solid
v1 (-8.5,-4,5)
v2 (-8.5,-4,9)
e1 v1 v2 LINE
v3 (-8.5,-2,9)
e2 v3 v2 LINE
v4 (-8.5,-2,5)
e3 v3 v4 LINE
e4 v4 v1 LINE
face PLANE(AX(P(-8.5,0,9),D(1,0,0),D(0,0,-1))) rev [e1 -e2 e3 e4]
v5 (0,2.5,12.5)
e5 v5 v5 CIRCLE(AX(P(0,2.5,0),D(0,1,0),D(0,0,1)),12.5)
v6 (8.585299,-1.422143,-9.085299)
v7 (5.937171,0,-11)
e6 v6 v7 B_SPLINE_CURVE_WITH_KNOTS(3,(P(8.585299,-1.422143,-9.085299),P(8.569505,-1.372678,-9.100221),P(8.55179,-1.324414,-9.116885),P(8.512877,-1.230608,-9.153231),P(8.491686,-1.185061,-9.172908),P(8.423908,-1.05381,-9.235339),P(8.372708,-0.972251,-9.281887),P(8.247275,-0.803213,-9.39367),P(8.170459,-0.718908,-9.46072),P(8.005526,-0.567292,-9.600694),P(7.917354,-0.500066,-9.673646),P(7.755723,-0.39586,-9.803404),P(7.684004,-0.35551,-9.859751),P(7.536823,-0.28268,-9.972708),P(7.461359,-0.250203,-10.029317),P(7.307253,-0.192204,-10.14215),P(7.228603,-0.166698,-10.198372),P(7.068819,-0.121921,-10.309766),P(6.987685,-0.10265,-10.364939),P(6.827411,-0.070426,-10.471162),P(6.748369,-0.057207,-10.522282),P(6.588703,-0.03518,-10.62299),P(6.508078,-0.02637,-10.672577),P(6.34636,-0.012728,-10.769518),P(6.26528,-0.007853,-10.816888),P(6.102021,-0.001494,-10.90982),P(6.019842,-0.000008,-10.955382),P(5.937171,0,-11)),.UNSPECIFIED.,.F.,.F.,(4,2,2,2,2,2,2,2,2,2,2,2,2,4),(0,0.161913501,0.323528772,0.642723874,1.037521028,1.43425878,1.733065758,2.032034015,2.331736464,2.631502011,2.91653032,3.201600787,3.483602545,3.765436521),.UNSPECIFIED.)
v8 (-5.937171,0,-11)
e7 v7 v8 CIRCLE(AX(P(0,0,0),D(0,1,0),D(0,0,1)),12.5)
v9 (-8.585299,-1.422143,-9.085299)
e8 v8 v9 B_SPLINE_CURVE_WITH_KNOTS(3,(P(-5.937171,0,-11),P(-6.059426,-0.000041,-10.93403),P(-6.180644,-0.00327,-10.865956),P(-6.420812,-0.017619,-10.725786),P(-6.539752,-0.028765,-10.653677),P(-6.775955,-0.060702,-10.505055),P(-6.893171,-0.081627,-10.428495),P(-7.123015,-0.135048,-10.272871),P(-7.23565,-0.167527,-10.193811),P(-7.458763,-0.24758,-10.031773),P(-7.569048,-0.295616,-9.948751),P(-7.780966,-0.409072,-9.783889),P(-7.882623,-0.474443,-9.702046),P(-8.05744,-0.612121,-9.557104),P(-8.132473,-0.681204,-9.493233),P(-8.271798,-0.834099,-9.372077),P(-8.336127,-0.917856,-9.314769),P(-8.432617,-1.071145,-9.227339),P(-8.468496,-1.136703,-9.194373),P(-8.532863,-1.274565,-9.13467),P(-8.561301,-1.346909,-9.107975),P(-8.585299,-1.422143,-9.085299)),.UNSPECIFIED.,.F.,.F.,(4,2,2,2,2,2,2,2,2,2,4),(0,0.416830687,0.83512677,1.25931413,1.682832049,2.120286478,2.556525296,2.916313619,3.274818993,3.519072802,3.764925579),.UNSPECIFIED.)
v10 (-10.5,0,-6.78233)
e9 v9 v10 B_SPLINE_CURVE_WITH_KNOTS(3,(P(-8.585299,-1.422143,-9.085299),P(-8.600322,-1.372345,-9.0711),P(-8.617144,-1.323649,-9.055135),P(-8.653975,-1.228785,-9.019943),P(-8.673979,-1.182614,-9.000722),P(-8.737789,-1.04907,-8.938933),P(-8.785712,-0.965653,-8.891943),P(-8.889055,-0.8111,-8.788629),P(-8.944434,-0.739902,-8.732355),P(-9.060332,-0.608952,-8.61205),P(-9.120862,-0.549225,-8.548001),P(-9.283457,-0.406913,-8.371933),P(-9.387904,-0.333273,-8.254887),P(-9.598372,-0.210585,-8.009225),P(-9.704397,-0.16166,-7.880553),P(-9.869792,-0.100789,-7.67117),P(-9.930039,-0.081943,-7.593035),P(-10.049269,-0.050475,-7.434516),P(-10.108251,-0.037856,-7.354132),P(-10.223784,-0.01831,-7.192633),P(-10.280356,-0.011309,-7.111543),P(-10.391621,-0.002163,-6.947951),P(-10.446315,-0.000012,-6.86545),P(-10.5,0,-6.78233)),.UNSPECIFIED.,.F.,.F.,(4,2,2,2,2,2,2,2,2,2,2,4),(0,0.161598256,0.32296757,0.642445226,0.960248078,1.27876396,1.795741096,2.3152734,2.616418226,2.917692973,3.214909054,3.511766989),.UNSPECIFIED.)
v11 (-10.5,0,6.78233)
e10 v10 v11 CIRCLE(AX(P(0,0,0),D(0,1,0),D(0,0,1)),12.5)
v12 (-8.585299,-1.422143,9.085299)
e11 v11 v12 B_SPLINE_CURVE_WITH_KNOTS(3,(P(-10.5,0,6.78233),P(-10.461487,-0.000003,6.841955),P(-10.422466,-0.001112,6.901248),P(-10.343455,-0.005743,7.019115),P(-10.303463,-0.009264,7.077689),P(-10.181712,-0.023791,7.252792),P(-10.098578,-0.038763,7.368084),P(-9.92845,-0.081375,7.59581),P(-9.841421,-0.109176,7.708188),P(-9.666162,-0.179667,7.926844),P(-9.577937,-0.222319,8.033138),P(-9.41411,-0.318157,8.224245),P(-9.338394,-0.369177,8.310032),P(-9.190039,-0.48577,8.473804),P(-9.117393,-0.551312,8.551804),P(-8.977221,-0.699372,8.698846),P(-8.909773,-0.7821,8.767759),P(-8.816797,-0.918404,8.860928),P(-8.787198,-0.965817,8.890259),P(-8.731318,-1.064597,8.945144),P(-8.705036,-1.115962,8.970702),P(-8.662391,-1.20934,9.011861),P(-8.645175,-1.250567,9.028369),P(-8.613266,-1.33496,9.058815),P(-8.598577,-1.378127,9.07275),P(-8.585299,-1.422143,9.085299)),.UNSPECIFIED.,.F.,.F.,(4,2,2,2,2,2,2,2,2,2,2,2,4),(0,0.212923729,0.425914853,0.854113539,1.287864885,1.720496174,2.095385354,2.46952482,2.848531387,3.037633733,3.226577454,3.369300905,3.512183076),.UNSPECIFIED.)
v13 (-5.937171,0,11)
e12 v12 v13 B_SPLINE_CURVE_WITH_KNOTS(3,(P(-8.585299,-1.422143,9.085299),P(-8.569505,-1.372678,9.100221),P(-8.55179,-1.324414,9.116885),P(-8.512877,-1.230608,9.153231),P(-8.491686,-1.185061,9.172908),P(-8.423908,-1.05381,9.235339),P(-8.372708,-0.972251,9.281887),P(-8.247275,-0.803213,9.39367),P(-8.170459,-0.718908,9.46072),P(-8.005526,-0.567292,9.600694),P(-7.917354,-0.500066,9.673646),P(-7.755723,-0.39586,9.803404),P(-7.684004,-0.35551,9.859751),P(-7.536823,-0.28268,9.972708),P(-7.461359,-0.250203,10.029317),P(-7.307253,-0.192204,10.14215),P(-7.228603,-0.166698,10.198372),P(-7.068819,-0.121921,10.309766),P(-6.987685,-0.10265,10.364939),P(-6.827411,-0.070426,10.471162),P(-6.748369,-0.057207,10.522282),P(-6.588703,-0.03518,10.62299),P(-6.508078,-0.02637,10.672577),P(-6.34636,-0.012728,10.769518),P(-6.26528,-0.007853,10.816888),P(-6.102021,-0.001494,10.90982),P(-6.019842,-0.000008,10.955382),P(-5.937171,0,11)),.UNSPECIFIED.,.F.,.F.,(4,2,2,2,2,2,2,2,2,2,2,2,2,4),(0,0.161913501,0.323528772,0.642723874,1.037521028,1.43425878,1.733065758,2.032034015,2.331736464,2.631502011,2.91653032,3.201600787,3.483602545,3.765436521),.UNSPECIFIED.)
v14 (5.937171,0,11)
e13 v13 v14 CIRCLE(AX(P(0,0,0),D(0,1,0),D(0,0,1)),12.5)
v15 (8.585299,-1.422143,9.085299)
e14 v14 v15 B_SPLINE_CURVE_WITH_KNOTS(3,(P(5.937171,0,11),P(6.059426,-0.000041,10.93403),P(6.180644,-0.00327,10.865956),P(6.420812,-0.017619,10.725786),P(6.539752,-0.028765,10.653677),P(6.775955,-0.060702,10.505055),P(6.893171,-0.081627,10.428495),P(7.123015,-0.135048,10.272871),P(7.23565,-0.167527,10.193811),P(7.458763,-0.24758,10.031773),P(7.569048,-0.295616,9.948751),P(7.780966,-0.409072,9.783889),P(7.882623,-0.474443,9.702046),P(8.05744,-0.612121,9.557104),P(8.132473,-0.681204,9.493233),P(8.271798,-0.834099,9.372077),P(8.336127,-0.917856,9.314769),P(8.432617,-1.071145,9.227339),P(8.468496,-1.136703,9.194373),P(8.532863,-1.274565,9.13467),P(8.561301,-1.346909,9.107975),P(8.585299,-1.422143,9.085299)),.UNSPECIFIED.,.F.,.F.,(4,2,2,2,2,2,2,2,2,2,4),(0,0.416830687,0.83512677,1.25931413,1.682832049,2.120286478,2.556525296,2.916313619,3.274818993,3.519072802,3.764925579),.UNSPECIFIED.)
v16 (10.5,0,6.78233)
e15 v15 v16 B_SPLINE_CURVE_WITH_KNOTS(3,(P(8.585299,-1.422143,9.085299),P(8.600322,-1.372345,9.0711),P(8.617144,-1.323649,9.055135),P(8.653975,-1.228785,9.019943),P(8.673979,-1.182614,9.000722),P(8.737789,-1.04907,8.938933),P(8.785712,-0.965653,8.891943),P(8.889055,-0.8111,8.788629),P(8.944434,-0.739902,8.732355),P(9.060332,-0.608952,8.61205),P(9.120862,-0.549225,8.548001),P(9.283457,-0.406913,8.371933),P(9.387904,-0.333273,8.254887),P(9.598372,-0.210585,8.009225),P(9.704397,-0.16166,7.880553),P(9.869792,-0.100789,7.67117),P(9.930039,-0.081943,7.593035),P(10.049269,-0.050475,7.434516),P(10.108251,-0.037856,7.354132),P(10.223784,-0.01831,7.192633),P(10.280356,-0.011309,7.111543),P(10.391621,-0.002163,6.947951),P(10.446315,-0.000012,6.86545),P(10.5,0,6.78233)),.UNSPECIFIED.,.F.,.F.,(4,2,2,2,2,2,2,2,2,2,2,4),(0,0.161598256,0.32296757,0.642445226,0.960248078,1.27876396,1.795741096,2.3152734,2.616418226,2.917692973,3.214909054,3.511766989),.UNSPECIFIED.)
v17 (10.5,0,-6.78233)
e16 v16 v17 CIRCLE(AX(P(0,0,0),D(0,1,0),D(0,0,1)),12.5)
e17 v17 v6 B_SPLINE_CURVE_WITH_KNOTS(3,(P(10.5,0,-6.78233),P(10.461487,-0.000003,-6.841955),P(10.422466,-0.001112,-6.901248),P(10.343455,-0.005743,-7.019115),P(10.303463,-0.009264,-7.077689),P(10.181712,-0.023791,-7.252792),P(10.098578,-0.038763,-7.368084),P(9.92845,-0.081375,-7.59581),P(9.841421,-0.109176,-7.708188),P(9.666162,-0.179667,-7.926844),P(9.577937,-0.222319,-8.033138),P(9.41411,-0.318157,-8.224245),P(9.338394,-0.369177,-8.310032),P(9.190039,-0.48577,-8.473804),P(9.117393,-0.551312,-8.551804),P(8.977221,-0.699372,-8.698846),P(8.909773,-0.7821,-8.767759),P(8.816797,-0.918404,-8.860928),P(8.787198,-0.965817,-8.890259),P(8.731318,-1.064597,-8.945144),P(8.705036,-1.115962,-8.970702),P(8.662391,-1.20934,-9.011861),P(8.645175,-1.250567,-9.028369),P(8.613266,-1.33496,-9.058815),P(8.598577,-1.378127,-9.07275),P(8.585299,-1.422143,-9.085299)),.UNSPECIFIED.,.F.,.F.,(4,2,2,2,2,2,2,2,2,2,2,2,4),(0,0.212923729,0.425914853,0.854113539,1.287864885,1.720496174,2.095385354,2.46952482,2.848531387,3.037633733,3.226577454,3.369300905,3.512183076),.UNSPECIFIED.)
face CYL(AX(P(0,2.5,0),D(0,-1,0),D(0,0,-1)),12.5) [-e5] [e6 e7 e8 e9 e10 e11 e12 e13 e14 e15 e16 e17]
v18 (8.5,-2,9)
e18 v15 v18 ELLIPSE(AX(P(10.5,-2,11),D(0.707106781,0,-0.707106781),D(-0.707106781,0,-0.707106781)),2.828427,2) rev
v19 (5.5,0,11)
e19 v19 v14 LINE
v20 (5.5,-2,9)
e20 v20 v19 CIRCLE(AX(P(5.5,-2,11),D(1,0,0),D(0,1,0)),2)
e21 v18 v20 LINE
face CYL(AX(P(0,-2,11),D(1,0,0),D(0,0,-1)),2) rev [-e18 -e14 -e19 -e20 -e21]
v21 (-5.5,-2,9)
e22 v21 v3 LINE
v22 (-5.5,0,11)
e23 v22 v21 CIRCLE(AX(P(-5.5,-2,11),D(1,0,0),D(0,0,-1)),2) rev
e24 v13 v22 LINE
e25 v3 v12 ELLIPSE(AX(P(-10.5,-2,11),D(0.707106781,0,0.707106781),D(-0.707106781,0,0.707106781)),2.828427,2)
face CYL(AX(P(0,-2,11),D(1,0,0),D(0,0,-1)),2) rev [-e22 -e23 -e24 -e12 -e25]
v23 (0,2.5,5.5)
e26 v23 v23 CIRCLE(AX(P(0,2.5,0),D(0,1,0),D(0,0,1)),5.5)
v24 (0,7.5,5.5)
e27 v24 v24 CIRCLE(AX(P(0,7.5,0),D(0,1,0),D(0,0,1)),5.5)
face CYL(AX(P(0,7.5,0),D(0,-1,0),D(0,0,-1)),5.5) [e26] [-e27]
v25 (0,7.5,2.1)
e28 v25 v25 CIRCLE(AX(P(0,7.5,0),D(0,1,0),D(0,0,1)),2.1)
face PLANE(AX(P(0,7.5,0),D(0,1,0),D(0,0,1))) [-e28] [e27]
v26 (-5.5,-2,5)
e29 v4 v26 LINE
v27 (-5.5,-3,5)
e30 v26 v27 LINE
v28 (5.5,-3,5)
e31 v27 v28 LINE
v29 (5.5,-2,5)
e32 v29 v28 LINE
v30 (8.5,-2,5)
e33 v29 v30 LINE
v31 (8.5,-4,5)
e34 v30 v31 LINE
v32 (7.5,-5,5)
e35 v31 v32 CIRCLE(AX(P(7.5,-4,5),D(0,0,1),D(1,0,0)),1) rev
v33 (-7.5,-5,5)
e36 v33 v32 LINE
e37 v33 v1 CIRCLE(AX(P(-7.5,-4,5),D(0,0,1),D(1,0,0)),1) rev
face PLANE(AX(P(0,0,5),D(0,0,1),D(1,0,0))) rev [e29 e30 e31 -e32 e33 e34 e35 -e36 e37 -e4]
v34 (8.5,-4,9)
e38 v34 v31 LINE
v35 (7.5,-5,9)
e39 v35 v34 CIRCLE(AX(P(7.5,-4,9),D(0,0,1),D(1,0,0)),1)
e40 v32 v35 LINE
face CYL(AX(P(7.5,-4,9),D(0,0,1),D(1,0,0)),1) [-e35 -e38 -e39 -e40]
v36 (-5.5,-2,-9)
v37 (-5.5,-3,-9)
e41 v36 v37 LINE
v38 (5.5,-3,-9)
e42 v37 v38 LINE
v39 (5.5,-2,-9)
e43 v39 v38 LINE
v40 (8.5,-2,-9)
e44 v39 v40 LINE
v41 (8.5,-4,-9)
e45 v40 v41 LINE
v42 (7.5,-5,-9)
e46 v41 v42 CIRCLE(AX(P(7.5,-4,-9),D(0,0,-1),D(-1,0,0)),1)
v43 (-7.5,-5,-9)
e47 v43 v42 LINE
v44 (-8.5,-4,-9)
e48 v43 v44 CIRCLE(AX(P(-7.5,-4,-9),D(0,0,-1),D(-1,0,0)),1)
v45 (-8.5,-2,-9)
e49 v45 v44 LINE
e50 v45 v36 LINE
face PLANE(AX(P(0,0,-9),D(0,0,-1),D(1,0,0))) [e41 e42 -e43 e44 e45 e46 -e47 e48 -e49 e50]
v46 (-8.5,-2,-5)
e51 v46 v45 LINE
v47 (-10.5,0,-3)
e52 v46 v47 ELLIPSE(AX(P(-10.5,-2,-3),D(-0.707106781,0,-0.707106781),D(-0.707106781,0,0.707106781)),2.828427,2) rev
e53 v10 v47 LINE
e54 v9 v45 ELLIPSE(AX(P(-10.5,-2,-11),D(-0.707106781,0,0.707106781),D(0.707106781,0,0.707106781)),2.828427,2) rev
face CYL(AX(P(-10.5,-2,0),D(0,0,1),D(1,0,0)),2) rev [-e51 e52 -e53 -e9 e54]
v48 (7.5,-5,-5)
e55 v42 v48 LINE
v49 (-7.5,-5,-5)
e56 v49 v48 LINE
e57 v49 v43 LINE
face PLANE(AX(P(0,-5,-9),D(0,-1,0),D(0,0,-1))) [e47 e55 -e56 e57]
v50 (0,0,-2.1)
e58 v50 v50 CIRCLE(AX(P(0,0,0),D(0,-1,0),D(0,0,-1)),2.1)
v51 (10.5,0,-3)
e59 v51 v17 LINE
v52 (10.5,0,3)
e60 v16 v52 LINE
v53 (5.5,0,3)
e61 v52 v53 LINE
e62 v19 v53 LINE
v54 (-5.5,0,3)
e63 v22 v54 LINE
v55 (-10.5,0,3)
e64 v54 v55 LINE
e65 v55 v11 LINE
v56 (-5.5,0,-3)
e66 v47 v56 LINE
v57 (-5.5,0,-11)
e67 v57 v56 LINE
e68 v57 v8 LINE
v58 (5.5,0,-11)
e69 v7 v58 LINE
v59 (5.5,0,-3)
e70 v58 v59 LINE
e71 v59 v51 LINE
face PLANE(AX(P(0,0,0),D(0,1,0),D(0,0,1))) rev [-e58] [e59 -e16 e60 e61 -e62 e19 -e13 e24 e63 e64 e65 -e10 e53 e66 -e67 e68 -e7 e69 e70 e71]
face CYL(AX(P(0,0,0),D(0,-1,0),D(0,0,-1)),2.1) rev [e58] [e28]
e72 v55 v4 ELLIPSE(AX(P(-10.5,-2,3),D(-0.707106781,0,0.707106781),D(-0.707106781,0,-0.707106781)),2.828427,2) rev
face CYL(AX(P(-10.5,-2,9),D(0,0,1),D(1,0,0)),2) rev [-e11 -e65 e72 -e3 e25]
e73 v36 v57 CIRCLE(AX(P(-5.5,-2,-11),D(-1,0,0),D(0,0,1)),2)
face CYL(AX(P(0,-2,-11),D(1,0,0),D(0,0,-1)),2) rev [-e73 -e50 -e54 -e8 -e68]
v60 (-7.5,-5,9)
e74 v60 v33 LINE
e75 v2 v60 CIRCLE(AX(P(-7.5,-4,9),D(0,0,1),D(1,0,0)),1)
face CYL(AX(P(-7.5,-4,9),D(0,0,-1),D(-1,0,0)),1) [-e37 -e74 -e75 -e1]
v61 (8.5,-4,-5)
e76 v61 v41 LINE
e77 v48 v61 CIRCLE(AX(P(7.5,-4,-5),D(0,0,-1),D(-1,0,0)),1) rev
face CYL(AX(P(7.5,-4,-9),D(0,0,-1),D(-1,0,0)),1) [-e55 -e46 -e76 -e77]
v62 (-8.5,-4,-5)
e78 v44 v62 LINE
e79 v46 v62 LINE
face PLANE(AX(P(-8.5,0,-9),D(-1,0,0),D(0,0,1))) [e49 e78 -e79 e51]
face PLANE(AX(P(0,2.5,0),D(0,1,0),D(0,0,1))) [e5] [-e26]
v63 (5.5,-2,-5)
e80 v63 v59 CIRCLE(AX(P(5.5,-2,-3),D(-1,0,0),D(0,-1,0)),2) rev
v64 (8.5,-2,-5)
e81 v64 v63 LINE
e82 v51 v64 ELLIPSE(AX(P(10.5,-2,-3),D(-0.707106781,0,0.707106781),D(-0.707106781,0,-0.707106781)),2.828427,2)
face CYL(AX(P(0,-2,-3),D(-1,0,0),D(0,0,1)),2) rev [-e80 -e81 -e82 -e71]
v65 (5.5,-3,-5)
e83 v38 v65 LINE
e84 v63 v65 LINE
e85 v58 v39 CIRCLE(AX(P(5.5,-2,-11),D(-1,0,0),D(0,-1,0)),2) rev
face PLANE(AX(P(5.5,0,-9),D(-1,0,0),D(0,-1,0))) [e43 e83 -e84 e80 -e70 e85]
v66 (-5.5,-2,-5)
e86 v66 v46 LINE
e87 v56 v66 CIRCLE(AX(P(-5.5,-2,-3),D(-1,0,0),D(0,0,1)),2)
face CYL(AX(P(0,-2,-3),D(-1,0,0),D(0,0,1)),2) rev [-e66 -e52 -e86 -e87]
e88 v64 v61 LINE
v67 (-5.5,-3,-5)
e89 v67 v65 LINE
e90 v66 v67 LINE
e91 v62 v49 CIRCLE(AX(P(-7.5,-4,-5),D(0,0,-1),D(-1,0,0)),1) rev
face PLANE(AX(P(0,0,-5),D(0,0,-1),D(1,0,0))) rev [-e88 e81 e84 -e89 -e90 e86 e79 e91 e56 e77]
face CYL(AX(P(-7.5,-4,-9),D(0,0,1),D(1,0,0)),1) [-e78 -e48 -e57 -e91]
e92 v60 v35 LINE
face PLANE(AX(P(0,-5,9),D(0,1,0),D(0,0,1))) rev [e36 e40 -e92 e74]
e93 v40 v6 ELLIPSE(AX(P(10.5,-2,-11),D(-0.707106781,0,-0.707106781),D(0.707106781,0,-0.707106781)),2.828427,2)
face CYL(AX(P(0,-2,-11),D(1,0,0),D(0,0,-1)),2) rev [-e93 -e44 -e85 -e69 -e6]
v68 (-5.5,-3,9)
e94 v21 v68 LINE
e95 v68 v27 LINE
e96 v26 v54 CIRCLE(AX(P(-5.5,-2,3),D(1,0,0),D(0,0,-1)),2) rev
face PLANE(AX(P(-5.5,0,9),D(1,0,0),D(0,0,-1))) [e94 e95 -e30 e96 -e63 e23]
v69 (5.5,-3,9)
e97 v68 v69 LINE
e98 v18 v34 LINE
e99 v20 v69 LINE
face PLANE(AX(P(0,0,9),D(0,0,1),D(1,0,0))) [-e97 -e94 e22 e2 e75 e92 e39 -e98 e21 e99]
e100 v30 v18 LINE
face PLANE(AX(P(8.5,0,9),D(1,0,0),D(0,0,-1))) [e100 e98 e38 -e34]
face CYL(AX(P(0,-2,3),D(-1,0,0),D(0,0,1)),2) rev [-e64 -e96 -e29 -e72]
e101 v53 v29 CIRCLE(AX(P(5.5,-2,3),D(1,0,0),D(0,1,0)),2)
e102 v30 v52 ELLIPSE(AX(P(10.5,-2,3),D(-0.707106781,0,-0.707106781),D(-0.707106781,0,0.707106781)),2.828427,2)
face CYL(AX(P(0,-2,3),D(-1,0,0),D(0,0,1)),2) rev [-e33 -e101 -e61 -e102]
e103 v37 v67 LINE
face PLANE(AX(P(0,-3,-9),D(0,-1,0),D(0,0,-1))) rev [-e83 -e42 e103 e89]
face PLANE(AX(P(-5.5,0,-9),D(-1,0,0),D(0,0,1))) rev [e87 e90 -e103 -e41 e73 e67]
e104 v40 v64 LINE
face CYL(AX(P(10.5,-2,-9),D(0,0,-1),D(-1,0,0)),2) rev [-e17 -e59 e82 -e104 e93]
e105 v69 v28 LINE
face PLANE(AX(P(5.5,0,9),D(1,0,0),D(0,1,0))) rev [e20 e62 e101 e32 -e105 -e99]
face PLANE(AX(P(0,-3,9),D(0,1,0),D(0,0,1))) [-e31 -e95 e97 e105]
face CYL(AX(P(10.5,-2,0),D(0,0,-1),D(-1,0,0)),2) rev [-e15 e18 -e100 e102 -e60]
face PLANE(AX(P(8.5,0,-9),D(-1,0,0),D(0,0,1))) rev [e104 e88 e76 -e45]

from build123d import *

# Parameters (mm, degrees)
SKETCH1_R                 = 12.5
BOSS_EXTRUDE1_DEPTH       = 2.5
SKETCH2_R                 = 5.5
BOSS_EXTRUDE2_DEPTH       = 5
F_3_0MM_DOWEL_HOLE1_D     = 4.2
F_3_0MM_DOWEL_HOLE1_DEPTH = 10
F_3_0MM_DOWEL_HOLE1_TIP   = 1.2618073
BOSS_EXTRUDE3_START       = -3
BOSS_EXTRUDE3_DEPTH       = 4
FILLET1_R                 = 2
FILLET2_R                 = 1


with BuildPart() as part:
    # Sketch1 → Boss-Extrude1 (new body)
    with BuildSketch(Plane(origin=(0, 0, 0), x_dir=(1, 0, 0), z_dir=(0, 1, 0))):
        with Locations(Location((0, 0, 0), (0, 0, 270))):
            Circle(SKETCH1_R)
    extrude(amount=BOSS_EXTRUDE1_DEPTH)

    # Sketch2 → Boss-Extrude2 (add)
    with BuildSketch(Plane(origin=(0, 2.5, 0), x_dir=(1, 0, 0), z_dir=(0, 1, 0))):
        with Locations(Location((0, 0, 0), (0, 0, 270))):
            Circle(SKETCH2_R)
    extrude(amount=BOSS_EXTRUDE2_DEPTH)

    # Ø3.0mm Dowel Hole1
    with Locations(Plane(origin=(0, 0, 0), x_dir=(-1, 0, 0), z_dir=(0, -1, 0))):
        with Locations((0, 0)):
            Hole(F_3_0MM_DOWEL_HOLE1_D / 2, depth=F_3_0MM_DOWEL_HOLE1_DEPTH)
            with Locations((0, 0, -(F_3_0MM_DOWEL_HOLE1_DEPTH + F_3_0MM_DOWEL_HOLE1_TIP / 2))):  # 118° drill point
                Cone(0, F_3_0MM_DOWEL_HOLE1_D / 2, F_3_0MM_DOWEL_HOLE1_TIP, mode=Mode.SUBTRACT)

    # Sketch6 → Boss-Extrude3 (add)
    with BuildSketch(Plane.XY.offset(8).offset(BOSS_EXTRUDE3_START)):
        Polygon((-5.5, 0), (-8.5, 0), (-8.5, -5), (8.5, -5), (8.5, 0), (5.5, 0), (5.5, -3), (-5.5, -3), align=None)
    boss_extrude3 = extrude(amount=BOSS_EXTRUDE3_DEPTH)

    # Mirror1: Boss-Extrude3 across plane
    add(boss_extrude3.mirror(Plane.XY))

    # Fillet1
    # the kernel refuses this fillet: 2 mm, written as the material it adds along each edge
    with BuildSketch(Plane(origin=(8.5, 0, 5), x_dir=(1, 0, 0), z_dir=(0, 0, 1))) as fillet1_piece_1_section:
        with BuildLine():
            CenterArc((FILLET1_R, -FILLET1_R), FILLET1_R, 90, 90)
            Line((0, -FILLET1_R), (0, 0))
            Line((0, 0), (FILLET1_R, 0))
        make_face()
    fillet1_piece_1 = extrude(amount=4, mode=Mode.PRIVATE)
    fillet1_piece_1 = fillet1_piece_1 & Plane(origin=(0, -0.480708784, 0), x_dir=(0, 0, 1), z_dir=(0, -1, 0)) * Cylinder(12.5, 16, mode=Mode.PRIVATE)
    add(fillet1_piece_1)
    with BuildSketch(Plane(origin=(8.5, 0, 9), x_dir=(0, 0, 1), z_dir=(-1, 0, 0))) as fillet1_piece_2_section:
        with BuildLine():
            CenterArc((FILLET1_R, -FILLET1_R), FILLET1_R, 90, 90)
            Line((0, -FILLET1_R), (0, 0))
            Line((0, 0), (FILLET1_R, 0))
        make_face()
    fillet1_piece_2 = extrude(amount=3, mode=Mode.PRIVATE)
    fillet1_piece_2 = fillet1_piece_2 & Plane(origin=(0, -0.497609904, 0), x_dir=(0, 0, 1), z_dir=(0, -1, 0)) * Cylinder(12.5, 14, mode=Mode.PRIVATE)
    add(fillet1_piece_2)
    with BuildSketch(Plane(origin=(-5.5, 0, 9), x_dir=(0, 0, 1), z_dir=(-1, 0, 0))) as fillet1_piece_3_section:
        with BuildLine():
            CenterArc((FILLET1_R, -FILLET1_R), FILLET1_R, 90, 90)
            Line((0, -FILLET1_R), (0, 0))
            Line((0, 0), (FILLET1_R, 0))
        make_face()
    fillet1_piece_3 = extrude(amount=3, mode=Mode.PRIVATE)
    fillet1_piece_3 = fillet1_piece_3 & Plane(origin=(0, -0.497609936, 0), x_dir=(0, 0, 1), z_dir=(0, -1, 0)) * Cylinder(12.5, 14, mode=Mode.PRIVATE)
    add(fillet1_piece_3)
    with BuildSketch(Plane(origin=(-8.5, 0, 5), x_dir=(-1, 0, 0), z_dir=(0, 0, 1))) as fillet1_piece_4_section:
        with BuildLine():
            CenterArc((FILLET1_R, FILLET1_R), FILLET1_R, 180, 90)
            Line((0, FILLET1_R), (0, 0))
            Line((0, 0), (FILLET1_R, 0))
        make_face()
    fillet1_piece_4 = extrude(amount=4, mode=Mode.PRIVATE)
    fillet1_piece_4 = fillet1_piece_4 & Plane(origin=(0, -0.48070882, 0), x_dir=(0, 0, 1), z_dir=(0, -1, 0)) * Cylinder(12.5, 16, mode=Mode.PRIVATE)
    add(fillet1_piece_4)
    with BuildSketch(Plane(origin=(8.5, 0, 5), x_dir=(0, 0, -1), z_dir=(-1, 0, 0)), Plane(origin=(-5.5, 0, 5), x_dir=(0, 0, -1), z_dir=(-1, 0, 0))) as fillet1_piece_5:
        with BuildLine():
            CenterArc((FILLET1_R, FILLET1_R), FILLET1_R, 180, 90)
            Line((0, FILLET1_R), (0, 0))
            Line((0, 0), (FILLET1_R, 0))
        make_face()
    extrude(amount=3)
    with BuildSketch(Plane(origin=(8.5, 0, -5), x_dir=(0, 0, 1), z_dir=(-1, 0, 0)), Plane(origin=(-5.5, 0, -5), x_dir=(0, 0, 1), z_dir=(-1, 0, 0))) as fillet1_piece_6:
        with BuildLine():
            CenterArc((FILLET1_R, -FILLET1_R), FILLET1_R, 90, 90)
            Line((0, -FILLET1_R), (0, 0))
            Line((0, 0), (FILLET1_R, 0))
        make_face()
    extrude(amount=3)
    with BuildSketch(Plane(origin=(8.5, 0, -5), x_dir=(1, 0, 0), z_dir=(0, 0, -1))) as fillet1_piece_7_section:
        with BuildLine():
            CenterArc((FILLET1_R, FILLET1_R), FILLET1_R, 180, 90)
            Line((0, FILLET1_R), (0, 0))
            Line((0, 0), (FILLET1_R, 0))
        make_face()
    fillet1_piece_7 = extrude(amount=4, mode=Mode.PRIVATE)
    fillet1_piece_7 = fillet1_piece_7 & Plane(origin=(0, -0.48070882, 0), x_dir=(0, 0, 1), z_dir=(0, -1, 0)) * Cylinder(12.5, 16, mode=Mode.PRIVATE)
    add(fillet1_piece_7)
    with BuildSketch(Plane(origin=(-8.5, 0, -5), x_dir=(-1, 0, 0), z_dir=(0, 0, -1))) as fillet1_piece_8_section:
        with BuildLine():
            CenterArc((FILLET1_R, -FILLET1_R), FILLET1_R, 90, 90)
            Line((0, -FILLET1_R), (0, 0))
            Line((0, 0), (FILLET1_R, 0))
        make_face()
    fillet1_piece_8 = extrude(amount=4, mode=Mode.PRIVATE)
    fillet1_piece_8 = fillet1_piece_8 & Plane(origin=(0, -0.480708785, 0), x_dir=(0, 0, 1), z_dir=(0, -1, 0)) * Cylinder(12.5, 16, mode=Mode.PRIVATE)
    add(fillet1_piece_8)
    with BuildSketch(Plane(origin=(8.5, 0, -9), x_dir=(0, 0, -1), z_dir=(-1, 0, 0))) as fillet1_piece_9_section:
        with BuildLine():
            CenterArc((FILLET1_R, FILLET1_R), FILLET1_R, 180, 90)
            Line((0, FILLET1_R), (0, 0))
            Line((0, 0), (FILLET1_R, 0))
        make_face()
    fillet1_piece_9 = extrude(amount=3, mode=Mode.PRIVATE)
    fillet1_piece_9 = fillet1_piece_9 & Plane(origin=(0, -0.497609946, 0), x_dir=(0, 0, 1), z_dir=(0, -1, 0)) * Cylinder(12.5, 14, mode=Mode.PRIVATE)
    add(fillet1_piece_9)
    with BuildSketch(Plane(origin=(-5.5, 0, -9), x_dir=(0, 0, -1), z_dir=(-1, 0, 0))) as fillet1_piece_10_section:
        with BuildLine():
            CenterArc((FILLET1_R, FILLET1_R), FILLET1_R, 180, 90)
            Line((0, FILLET1_R), (0, 0))
            Line((0, 0), (FILLET1_R, 0))
        make_face()
    fillet1_piece_10 = extrude(amount=3, mode=Mode.PRIVATE)
    fillet1_piece_10 = fillet1_piece_10 & Plane(origin=(0, -0.497609939, 0), x_dir=(0, 0, 1), z_dir=(0, -1, 0)) * Cylinder(12.5, 14, mode=Mode.PRIVATE)
    add(fillet1_piece_10)
    with BuildSketch(Plane(origin=(13.5, 0, 5), x_dir=(0, 0, -1), z_dir=(-1, 0, 0))) as fillet1_piece_11a_section:
        with BuildLine():
            CenterArc((FILLET1_R, FILLET1_R), FILLET1_R, 180, 90)
            Line((0, FILLET1_R), (0, 0))
            Line((0, 0), (FILLET1_R, 0))
        make_face()
    fillet1_piece_11a = extrude(amount=8, mode=Mode.PRIVATE)
    fillet1_piece_11a = fillet1_piece_11a & Plane(origin=(0, -0.439550535, 0), x_dir=(0, 0, 1), z_dir=(0, -1, 0)) * Cylinder(12.5, 24, mode=Mode.PRIVATE)
    fillet1_piece_11a = split(fillet1_piece_11a, bisect_by=Plane(origin=(8.5, -0.439550535, 4.525411001), z_dir=(1, 0, 0)), keep=Keep.TOP, mode=Mode.PRIVATE)
    with BuildSketch(Plane(origin=(8.5, 0, 0), x_dir=(1, 0, 0), z_dir=(0, 0, 1))) as fillet1_piece_11b_section:
        with BuildLine():
            CenterArc((FILLET1_R, -FILLET1_R), FILLET1_R, 90, 90)
            Line((0, -FILLET1_R), (0, 0))
            Line((0, 0), (FILLET1_R, 0))
        make_face()
    fillet1_piece_11b = extrude(amount=9, mode=Mode.PRIVATE)
    fillet1_piece_11b = split(fillet1_piece_11b, bisect_by=Plane(origin=(8.952790229, -0.452790229, 5), z_dir=(0, 0, -1)), keep=Keep.TOP, mode=Mode.PRIVATE)
    fillet1_piece_11 = fillet1_piece_11a & fillet1_piece_11b
    add(fillet1_piece_11)
    with BuildSketch(Plane(origin=(8.5, 0, 5), x_dir=(1, 0, 0), z_dir=(0, 0, 1))) as fillet1_piece_12a_section:
        with BuildLine():
            CenterArc((FILLET1_R, -FILLET1_R), FILLET1_R, 90, 90)
            Line((0, -FILLET1_R), (0, 0))
            Line((0, 0), (FILLET1_R, 0))
        make_face()
    fillet1_piece_12a = extrude(amount=9, mode=Mode.PRIVATE)
    fillet1_piece_12a = fillet1_piece_12a & Plane(origin=(0, -0.851863441, 0), x_dir=(0, 0, 1), z_dir=(0, -1, 0)) * Cylinder(12.5, 26, mode=Mode.PRIVATE)
    fillet1_piece_12a = split(fillet1_piece_12a, bisect_by=Plane(origin=(8.524607879, -0.851863441, 9), z_dir=(0, 0, 1)), keep=Keep.TOP, mode=Mode.PRIVATE)
    with BuildSketch(Plane(origin=(13.5, 0, 9), x_dir=(0, 0, 1), z_dir=(-1, 0, 0))) as fillet1_piece_12b_section:
        with BuildLine():
            CenterArc((FILLET1_R, -FILLET1_R), FILLET1_R, 90, 90)
            Line((0, -FILLET1_R), (0, 0))
            Line((0, 0), (FILLET1_R, 0))
        make_face()
    fillet1_piece_12b = extrude(amount=8, mode=Mode.PRIVATE)
    fillet1_piece_12b = fillet1_piece_12b & Plane(origin=(0, -0.857818141, 0), x_dir=(0, 0, 1), z_dir=(0, -1, 0)) * Cylinder(12.5, 24, mode=Mode.PRIVATE)
    fillet1_piece_12b = split(fillet1_piece_12b, bisect_by=Plane(origin=(8.5, -0.857818141, 9.021962646), z_dir=(1, 0, 0)), keep=Keep.TOP, mode=Mode.PRIVATE)
    fillet1_piece_12 = fillet1_piece_12a & fillet1_piece_12b
    add(fillet1_piece_12)
    with BuildSketch(Plane(origin=(-8.5, 0, 5), x_dir=(-1, 0, 0), z_dir=(0, 0, 1))) as fillet1_piece_13a_section:
        with BuildLine():
            CenterArc((FILLET1_R, FILLET1_R), FILLET1_R, 180, 90)
            Line((0, FILLET1_R), (0, 0))
            Line((0, 0), (FILLET1_R, 0))
        make_face()
    fillet1_piece_13a = extrude(amount=9, mode=Mode.PRIVATE)
    fillet1_piece_13a = fillet1_piece_13a & Plane(origin=(0, -0.851863441, 0), x_dir=(0, 0, 1), z_dir=(0, -1, 0)) * Cylinder(12.5, 26, mode=Mode.PRIVATE)
    fillet1_piece_13a = split(fillet1_piece_13a, bisect_by=Plane(origin=(-8.524607879, -0.851863441, 9), z_dir=(0, 0, 1)), keep=Keep.TOP, mode=Mode.PRIVATE)
    with BuildSketch(Plane(origin=(-5.5, 0, 9), x_dir=(0, 0, 1), z_dir=(-1, 0, 0))) as fillet1_piece_13b_section:
        with BuildLine():
            CenterArc((FILLET1_R, -FILLET1_R), FILLET1_R, 90, 90)
            Line((0, -FILLET1_R), (0, 0))
            Line((0, 0), (FILLET1_R, 0))
        make_face()
    fillet1_piece_13b = extrude(amount=8, mode=Mode.PRIVATE)
    fillet1_piece_13b = fillet1_piece_13b & Plane(origin=(0, -0.857818141, 0), x_dir=(0, 0, 1), z_dir=(0, -1, 0)) * Cylinder(12.5, 24, mode=Mode.PRIVATE)
    fillet1_piece_13b = split(fillet1_piece_13b, bisect_by=Plane(origin=(-8.5, -0.857818141, 9.021962647), z_dir=(-1, 0, 0)), keep=Keep.TOP, mode=Mode.PRIVATE)
    fillet1_piece_13 = fillet1_piece_13a & fillet1_piece_13b
    add(fillet1_piece_13)
    with BuildSketch(Plane(origin=(-5.5, 0, 5), x_dir=(0, 0, -1), z_dir=(-1, 0, 0))) as fillet1_piece_14a_section:
        with BuildLine():
            CenterArc((FILLET1_R, FILLET1_R), FILLET1_R, 180, 90)
            Line((0, FILLET1_R), (0, 0))
            Line((0, 0), (FILLET1_R, 0))
        make_face()
    fillet1_piece_14a = extrude(amount=8, mode=Mode.PRIVATE)
    fillet1_piece_14a = fillet1_piece_14a & Plane(origin=(0, -0.439548718, 0), x_dir=(0, 0, 1), z_dir=(0, -1, 0)) * Cylinder(12.5, 24, mode=Mode.PRIVATE)
    fillet1_piece_14a = split(fillet1_piece_14a, bisect_by=Plane(origin=(-8.5, -0.439548718, 4.525414754), z_dir=(-1, 0, 0)), keep=Keep.TOP, mode=Mode.PRIVATE)
    with BuildSketch(Plane(origin=(-8.5, 0, 0), x_dir=(-1, 0, 0), z_dir=(0, 0, 1))) as fillet1_piece_14b_section:
        with BuildLine():
            CenterArc((FILLET1_R, FILLET1_R), FILLET1_R, 180, 90)
            Line((0, FILLET1_R), (0, 0))
            Line((0, 0), (FILLET1_R, 0))
        make_face()
    fillet1_piece_14b = extrude(amount=9, mode=Mode.PRIVATE)
    fillet1_piece_14b = split(fillet1_piece_14b, bisect_by=Plane(origin=(-8.952790229, -0.452790229, 5), z_dir=(0, 0, -1)), keep=Keep.TOP, mode=Mode.PRIVATE)
    fillet1_piece_14 = fillet1_piece_14a & fillet1_piece_14b
    add(fillet1_piece_14)
    with BuildSketch(Plane(origin=(8.5, 0, 0), x_dir=(1, 0, 0), z_dir=(0, 0, -1))) as fillet1_piece_15a_section:
        with BuildLine():
            CenterArc((FILLET1_R, FILLET1_R), FILLET1_R, 180, 90)
            Line((0, FILLET1_R), (0, 0))
            Line((0, 0), (FILLET1_R, 0))
        make_face()
    fillet1_piece_15a = extrude(amount=9, mode=Mode.PRIVATE)
    fillet1_piece_15a = split(fillet1_piece_15a, bisect_by=Plane(origin=(8.952790229, -0.452790229, -5), z_dir=(0, 0, 1)), keep=Keep.TOP, mode=Mode.PRIVATE)
    with BuildSketch(Plane(origin=(13.5, 0, -5), x_dir=(0, 0, 1), z_dir=(-1, 0, 0))) as fillet1_piece_15b_section:
        with BuildLine():
            CenterArc((FILLET1_R, -FILLET1_R), FILLET1_R, 90, 90)
            Line((0, -FILLET1_R), (0, 0))
            Line((0, 0), (FILLET1_R, 0))
        make_face()
    fillet1_piece_15b = extrude(amount=8, mode=Mode.PRIVATE)
    fillet1_piece_15b = fillet1_piece_15b & Plane(origin=(0, -0.439548718, 0), x_dir=(0, 0, 1), z_dir=(0, -1, 0)) * Cylinder(12.5, 24, mode=Mode.PRIVATE)
    fillet1_piece_15b = split(fillet1_piece_15b, bisect_by=Plane(origin=(8.5, -0.439548718, -4.525414754), z_dir=(1, 0, 0)), keep=Keep.TOP, mode=Mode.PRIVATE)
    fillet1_piece_15 = fillet1_piece_15a & fillet1_piece_15b
    add(fillet1_piece_15)
    with BuildSketch(Plane(origin=(8.5, 0, -5), x_dir=(1, 0, 0), z_dir=(0, 0, -1))) as fillet1_piece_16a_section:
        with BuildLine():
            CenterArc((FILLET1_R, FILLET1_R), FILLET1_R, 180, 90)
            Line((0, FILLET1_R), (0, 0))
            Line((0, 0), (FILLET1_R, 0))
        make_face()
    fillet1_piece_16a = extrude(amount=9, mode=Mode.PRIVATE)
    fillet1_piece_16a = fillet1_piece_16a & Plane(origin=(0, -0.85186344, 0), x_dir=(0, 0, 1), z_dir=(0, -1, 0)) * Cylinder(12.5, 26, mode=Mode.PRIVATE)
    fillet1_piece_16a = split(fillet1_piece_16a, bisect_by=Plane(origin=(8.524607879, -0.85186344, -9), z_dir=(0, 0, -1)), keep=Keep.TOP, mode=Mode.PRIVATE)
    with BuildSketch(Plane(origin=(13.5, 0, -9), x_dir=(0, 0, -1), z_dir=(-1, 0, 0))) as fillet1_piece_16b_section:
        with BuildLine():
            CenterArc((FILLET1_R, FILLET1_R), FILLET1_R, 180, 90)
            Line((0, FILLET1_R), (0, 0))
            Line((0, 0), (FILLET1_R, 0))
        make_face()
    fillet1_piece_16b = extrude(amount=8, mode=Mode.PRIVATE)
    fillet1_piece_16b = fillet1_piece_16b & Plane(origin=(0, -0.85781814, 0), x_dir=(0, 0, 1), z_dir=(0, -1, 0)) * Cylinder(12.5, 24, mode=Mode.PRIVATE)
    fillet1_piece_16b = split(fillet1_piece_16b, bisect_by=Plane(origin=(8.5, -0.85781814, -9.021962646), z_dir=(1, 0, 0)), keep=Keep.TOP, mode=Mode.PRIVATE)
    fillet1_piece_16 = fillet1_piece_16a & fillet1_piece_16b
    add(fillet1_piece_16)
    with BuildSketch(Plane(origin=(-8.5, 0, 0), x_dir=(-1, 0, 0), z_dir=(0, 0, -1))) as fillet1_piece_17a_section:
        with BuildLine():
            CenterArc((FILLET1_R, -FILLET1_R), FILLET1_R, 90, 90)
            Line((0, -FILLET1_R), (0, 0))
            Line((0, 0), (FILLET1_R, 0))
        make_face()
    fillet1_piece_17a = extrude(amount=9, mode=Mode.PRIVATE)
    fillet1_piece_17a = split(fillet1_piece_17a, bisect_by=Plane(origin=(-8.952790229, -0.452790229, -5), z_dir=(0, 0, 1)), keep=Keep.TOP, mode=Mode.PRIVATE)
    with BuildSketch(Plane(origin=(-5.5, 0, -5), x_dir=(0, 0, 1), z_dir=(-1, 0, 0))) as fillet1_piece_17b_section:
        with BuildLine():
            CenterArc((FILLET1_R, -FILLET1_R), FILLET1_R, 90, 90)
            Line((0, -FILLET1_R), (0, 0))
            Line((0, 0), (FILLET1_R, 0))
        make_face()
    fillet1_piece_17b = extrude(amount=8, mode=Mode.PRIVATE)
    fillet1_piece_17b = fillet1_piece_17b & Plane(origin=(0, -0.439550535, 0), x_dir=(0, 0, 1), z_dir=(0, -1, 0)) * Cylinder(12.5, 24, mode=Mode.PRIVATE)
    fillet1_piece_17b = split(fillet1_piece_17b, bisect_by=Plane(origin=(-8.5, -0.439550535, -4.525411001), z_dir=(-1, 0, 0)), keep=Keep.TOP, mode=Mode.PRIVATE)
    fillet1_piece_17 = fillet1_piece_17a & fillet1_piece_17b
    add(fillet1_piece_17)
    with BuildSketch(Plane(origin=(-5.5, 0, -9), x_dir=(0, 0, -1), z_dir=(-1, 0, 0))) as fillet1_piece_18a_section:
        with BuildLine():
            CenterArc((FILLET1_R, FILLET1_R), FILLET1_R, 180, 90)
            Line((0, FILLET1_R), (0, 0))
            Line((0, 0), (FILLET1_R, 0))
        make_face()
    fillet1_piece_18a = extrude(amount=8, mode=Mode.PRIVATE)
    fillet1_piece_18a = fillet1_piece_18a & Plane(origin=(0, -0.857818141, 0), x_dir=(0, 0, 1), z_dir=(0, -1, 0)) * Cylinder(12.5, 24, mode=Mode.PRIVATE)
    fillet1_piece_18a = split(fillet1_piece_18a, bisect_by=Plane(origin=(-8.5, -0.857818141, -9.021962647), z_dir=(-1, 0, 0)), keep=Keep.TOP, mode=Mode.PRIVATE)
    with BuildSketch(Plane(origin=(-8.5, 0, -5), x_dir=(-1, 0, 0), z_dir=(0, 0, -1))) as fillet1_piece_18b_section:
        with BuildLine():
            CenterArc((FILLET1_R, -FILLET1_R), FILLET1_R, 90, 90)
            Line((0, -FILLET1_R), (0, 0))
            Line((0, 0), (FILLET1_R, 0))
        make_face()
    fillet1_piece_18b = extrude(amount=9, mode=Mode.PRIVATE)
    fillet1_piece_18b = fillet1_piece_18b & Plane(origin=(0, -0.851863441, 0), x_dir=(0, 0, 1), z_dir=(0, -1, 0)) * Cylinder(12.5, 26, mode=Mode.PRIVATE)
    fillet1_piece_18b = split(fillet1_piece_18b, bisect_by=Plane(origin=(-8.524607879, -0.851863441, -9), z_dir=(0, 0, -1)), keep=Keep.TOP, mode=Mode.PRIVATE)
    fillet1_piece_18 = fillet1_piece_18a & fillet1_piece_18b
    add(fillet1_piece_18)

    # Fillet2
    fillet2_edges = [part.edges().sort_by_distance(p)[0] for p in [
        (-8.5, -5, 7),
        (8.5, -5, 7),
        (8.5, -5, -7),
        (-8.5, -5, -7),
    ]]
    fillet(fillet2_edges, radius=FILLET2_R)


solid = part.part
